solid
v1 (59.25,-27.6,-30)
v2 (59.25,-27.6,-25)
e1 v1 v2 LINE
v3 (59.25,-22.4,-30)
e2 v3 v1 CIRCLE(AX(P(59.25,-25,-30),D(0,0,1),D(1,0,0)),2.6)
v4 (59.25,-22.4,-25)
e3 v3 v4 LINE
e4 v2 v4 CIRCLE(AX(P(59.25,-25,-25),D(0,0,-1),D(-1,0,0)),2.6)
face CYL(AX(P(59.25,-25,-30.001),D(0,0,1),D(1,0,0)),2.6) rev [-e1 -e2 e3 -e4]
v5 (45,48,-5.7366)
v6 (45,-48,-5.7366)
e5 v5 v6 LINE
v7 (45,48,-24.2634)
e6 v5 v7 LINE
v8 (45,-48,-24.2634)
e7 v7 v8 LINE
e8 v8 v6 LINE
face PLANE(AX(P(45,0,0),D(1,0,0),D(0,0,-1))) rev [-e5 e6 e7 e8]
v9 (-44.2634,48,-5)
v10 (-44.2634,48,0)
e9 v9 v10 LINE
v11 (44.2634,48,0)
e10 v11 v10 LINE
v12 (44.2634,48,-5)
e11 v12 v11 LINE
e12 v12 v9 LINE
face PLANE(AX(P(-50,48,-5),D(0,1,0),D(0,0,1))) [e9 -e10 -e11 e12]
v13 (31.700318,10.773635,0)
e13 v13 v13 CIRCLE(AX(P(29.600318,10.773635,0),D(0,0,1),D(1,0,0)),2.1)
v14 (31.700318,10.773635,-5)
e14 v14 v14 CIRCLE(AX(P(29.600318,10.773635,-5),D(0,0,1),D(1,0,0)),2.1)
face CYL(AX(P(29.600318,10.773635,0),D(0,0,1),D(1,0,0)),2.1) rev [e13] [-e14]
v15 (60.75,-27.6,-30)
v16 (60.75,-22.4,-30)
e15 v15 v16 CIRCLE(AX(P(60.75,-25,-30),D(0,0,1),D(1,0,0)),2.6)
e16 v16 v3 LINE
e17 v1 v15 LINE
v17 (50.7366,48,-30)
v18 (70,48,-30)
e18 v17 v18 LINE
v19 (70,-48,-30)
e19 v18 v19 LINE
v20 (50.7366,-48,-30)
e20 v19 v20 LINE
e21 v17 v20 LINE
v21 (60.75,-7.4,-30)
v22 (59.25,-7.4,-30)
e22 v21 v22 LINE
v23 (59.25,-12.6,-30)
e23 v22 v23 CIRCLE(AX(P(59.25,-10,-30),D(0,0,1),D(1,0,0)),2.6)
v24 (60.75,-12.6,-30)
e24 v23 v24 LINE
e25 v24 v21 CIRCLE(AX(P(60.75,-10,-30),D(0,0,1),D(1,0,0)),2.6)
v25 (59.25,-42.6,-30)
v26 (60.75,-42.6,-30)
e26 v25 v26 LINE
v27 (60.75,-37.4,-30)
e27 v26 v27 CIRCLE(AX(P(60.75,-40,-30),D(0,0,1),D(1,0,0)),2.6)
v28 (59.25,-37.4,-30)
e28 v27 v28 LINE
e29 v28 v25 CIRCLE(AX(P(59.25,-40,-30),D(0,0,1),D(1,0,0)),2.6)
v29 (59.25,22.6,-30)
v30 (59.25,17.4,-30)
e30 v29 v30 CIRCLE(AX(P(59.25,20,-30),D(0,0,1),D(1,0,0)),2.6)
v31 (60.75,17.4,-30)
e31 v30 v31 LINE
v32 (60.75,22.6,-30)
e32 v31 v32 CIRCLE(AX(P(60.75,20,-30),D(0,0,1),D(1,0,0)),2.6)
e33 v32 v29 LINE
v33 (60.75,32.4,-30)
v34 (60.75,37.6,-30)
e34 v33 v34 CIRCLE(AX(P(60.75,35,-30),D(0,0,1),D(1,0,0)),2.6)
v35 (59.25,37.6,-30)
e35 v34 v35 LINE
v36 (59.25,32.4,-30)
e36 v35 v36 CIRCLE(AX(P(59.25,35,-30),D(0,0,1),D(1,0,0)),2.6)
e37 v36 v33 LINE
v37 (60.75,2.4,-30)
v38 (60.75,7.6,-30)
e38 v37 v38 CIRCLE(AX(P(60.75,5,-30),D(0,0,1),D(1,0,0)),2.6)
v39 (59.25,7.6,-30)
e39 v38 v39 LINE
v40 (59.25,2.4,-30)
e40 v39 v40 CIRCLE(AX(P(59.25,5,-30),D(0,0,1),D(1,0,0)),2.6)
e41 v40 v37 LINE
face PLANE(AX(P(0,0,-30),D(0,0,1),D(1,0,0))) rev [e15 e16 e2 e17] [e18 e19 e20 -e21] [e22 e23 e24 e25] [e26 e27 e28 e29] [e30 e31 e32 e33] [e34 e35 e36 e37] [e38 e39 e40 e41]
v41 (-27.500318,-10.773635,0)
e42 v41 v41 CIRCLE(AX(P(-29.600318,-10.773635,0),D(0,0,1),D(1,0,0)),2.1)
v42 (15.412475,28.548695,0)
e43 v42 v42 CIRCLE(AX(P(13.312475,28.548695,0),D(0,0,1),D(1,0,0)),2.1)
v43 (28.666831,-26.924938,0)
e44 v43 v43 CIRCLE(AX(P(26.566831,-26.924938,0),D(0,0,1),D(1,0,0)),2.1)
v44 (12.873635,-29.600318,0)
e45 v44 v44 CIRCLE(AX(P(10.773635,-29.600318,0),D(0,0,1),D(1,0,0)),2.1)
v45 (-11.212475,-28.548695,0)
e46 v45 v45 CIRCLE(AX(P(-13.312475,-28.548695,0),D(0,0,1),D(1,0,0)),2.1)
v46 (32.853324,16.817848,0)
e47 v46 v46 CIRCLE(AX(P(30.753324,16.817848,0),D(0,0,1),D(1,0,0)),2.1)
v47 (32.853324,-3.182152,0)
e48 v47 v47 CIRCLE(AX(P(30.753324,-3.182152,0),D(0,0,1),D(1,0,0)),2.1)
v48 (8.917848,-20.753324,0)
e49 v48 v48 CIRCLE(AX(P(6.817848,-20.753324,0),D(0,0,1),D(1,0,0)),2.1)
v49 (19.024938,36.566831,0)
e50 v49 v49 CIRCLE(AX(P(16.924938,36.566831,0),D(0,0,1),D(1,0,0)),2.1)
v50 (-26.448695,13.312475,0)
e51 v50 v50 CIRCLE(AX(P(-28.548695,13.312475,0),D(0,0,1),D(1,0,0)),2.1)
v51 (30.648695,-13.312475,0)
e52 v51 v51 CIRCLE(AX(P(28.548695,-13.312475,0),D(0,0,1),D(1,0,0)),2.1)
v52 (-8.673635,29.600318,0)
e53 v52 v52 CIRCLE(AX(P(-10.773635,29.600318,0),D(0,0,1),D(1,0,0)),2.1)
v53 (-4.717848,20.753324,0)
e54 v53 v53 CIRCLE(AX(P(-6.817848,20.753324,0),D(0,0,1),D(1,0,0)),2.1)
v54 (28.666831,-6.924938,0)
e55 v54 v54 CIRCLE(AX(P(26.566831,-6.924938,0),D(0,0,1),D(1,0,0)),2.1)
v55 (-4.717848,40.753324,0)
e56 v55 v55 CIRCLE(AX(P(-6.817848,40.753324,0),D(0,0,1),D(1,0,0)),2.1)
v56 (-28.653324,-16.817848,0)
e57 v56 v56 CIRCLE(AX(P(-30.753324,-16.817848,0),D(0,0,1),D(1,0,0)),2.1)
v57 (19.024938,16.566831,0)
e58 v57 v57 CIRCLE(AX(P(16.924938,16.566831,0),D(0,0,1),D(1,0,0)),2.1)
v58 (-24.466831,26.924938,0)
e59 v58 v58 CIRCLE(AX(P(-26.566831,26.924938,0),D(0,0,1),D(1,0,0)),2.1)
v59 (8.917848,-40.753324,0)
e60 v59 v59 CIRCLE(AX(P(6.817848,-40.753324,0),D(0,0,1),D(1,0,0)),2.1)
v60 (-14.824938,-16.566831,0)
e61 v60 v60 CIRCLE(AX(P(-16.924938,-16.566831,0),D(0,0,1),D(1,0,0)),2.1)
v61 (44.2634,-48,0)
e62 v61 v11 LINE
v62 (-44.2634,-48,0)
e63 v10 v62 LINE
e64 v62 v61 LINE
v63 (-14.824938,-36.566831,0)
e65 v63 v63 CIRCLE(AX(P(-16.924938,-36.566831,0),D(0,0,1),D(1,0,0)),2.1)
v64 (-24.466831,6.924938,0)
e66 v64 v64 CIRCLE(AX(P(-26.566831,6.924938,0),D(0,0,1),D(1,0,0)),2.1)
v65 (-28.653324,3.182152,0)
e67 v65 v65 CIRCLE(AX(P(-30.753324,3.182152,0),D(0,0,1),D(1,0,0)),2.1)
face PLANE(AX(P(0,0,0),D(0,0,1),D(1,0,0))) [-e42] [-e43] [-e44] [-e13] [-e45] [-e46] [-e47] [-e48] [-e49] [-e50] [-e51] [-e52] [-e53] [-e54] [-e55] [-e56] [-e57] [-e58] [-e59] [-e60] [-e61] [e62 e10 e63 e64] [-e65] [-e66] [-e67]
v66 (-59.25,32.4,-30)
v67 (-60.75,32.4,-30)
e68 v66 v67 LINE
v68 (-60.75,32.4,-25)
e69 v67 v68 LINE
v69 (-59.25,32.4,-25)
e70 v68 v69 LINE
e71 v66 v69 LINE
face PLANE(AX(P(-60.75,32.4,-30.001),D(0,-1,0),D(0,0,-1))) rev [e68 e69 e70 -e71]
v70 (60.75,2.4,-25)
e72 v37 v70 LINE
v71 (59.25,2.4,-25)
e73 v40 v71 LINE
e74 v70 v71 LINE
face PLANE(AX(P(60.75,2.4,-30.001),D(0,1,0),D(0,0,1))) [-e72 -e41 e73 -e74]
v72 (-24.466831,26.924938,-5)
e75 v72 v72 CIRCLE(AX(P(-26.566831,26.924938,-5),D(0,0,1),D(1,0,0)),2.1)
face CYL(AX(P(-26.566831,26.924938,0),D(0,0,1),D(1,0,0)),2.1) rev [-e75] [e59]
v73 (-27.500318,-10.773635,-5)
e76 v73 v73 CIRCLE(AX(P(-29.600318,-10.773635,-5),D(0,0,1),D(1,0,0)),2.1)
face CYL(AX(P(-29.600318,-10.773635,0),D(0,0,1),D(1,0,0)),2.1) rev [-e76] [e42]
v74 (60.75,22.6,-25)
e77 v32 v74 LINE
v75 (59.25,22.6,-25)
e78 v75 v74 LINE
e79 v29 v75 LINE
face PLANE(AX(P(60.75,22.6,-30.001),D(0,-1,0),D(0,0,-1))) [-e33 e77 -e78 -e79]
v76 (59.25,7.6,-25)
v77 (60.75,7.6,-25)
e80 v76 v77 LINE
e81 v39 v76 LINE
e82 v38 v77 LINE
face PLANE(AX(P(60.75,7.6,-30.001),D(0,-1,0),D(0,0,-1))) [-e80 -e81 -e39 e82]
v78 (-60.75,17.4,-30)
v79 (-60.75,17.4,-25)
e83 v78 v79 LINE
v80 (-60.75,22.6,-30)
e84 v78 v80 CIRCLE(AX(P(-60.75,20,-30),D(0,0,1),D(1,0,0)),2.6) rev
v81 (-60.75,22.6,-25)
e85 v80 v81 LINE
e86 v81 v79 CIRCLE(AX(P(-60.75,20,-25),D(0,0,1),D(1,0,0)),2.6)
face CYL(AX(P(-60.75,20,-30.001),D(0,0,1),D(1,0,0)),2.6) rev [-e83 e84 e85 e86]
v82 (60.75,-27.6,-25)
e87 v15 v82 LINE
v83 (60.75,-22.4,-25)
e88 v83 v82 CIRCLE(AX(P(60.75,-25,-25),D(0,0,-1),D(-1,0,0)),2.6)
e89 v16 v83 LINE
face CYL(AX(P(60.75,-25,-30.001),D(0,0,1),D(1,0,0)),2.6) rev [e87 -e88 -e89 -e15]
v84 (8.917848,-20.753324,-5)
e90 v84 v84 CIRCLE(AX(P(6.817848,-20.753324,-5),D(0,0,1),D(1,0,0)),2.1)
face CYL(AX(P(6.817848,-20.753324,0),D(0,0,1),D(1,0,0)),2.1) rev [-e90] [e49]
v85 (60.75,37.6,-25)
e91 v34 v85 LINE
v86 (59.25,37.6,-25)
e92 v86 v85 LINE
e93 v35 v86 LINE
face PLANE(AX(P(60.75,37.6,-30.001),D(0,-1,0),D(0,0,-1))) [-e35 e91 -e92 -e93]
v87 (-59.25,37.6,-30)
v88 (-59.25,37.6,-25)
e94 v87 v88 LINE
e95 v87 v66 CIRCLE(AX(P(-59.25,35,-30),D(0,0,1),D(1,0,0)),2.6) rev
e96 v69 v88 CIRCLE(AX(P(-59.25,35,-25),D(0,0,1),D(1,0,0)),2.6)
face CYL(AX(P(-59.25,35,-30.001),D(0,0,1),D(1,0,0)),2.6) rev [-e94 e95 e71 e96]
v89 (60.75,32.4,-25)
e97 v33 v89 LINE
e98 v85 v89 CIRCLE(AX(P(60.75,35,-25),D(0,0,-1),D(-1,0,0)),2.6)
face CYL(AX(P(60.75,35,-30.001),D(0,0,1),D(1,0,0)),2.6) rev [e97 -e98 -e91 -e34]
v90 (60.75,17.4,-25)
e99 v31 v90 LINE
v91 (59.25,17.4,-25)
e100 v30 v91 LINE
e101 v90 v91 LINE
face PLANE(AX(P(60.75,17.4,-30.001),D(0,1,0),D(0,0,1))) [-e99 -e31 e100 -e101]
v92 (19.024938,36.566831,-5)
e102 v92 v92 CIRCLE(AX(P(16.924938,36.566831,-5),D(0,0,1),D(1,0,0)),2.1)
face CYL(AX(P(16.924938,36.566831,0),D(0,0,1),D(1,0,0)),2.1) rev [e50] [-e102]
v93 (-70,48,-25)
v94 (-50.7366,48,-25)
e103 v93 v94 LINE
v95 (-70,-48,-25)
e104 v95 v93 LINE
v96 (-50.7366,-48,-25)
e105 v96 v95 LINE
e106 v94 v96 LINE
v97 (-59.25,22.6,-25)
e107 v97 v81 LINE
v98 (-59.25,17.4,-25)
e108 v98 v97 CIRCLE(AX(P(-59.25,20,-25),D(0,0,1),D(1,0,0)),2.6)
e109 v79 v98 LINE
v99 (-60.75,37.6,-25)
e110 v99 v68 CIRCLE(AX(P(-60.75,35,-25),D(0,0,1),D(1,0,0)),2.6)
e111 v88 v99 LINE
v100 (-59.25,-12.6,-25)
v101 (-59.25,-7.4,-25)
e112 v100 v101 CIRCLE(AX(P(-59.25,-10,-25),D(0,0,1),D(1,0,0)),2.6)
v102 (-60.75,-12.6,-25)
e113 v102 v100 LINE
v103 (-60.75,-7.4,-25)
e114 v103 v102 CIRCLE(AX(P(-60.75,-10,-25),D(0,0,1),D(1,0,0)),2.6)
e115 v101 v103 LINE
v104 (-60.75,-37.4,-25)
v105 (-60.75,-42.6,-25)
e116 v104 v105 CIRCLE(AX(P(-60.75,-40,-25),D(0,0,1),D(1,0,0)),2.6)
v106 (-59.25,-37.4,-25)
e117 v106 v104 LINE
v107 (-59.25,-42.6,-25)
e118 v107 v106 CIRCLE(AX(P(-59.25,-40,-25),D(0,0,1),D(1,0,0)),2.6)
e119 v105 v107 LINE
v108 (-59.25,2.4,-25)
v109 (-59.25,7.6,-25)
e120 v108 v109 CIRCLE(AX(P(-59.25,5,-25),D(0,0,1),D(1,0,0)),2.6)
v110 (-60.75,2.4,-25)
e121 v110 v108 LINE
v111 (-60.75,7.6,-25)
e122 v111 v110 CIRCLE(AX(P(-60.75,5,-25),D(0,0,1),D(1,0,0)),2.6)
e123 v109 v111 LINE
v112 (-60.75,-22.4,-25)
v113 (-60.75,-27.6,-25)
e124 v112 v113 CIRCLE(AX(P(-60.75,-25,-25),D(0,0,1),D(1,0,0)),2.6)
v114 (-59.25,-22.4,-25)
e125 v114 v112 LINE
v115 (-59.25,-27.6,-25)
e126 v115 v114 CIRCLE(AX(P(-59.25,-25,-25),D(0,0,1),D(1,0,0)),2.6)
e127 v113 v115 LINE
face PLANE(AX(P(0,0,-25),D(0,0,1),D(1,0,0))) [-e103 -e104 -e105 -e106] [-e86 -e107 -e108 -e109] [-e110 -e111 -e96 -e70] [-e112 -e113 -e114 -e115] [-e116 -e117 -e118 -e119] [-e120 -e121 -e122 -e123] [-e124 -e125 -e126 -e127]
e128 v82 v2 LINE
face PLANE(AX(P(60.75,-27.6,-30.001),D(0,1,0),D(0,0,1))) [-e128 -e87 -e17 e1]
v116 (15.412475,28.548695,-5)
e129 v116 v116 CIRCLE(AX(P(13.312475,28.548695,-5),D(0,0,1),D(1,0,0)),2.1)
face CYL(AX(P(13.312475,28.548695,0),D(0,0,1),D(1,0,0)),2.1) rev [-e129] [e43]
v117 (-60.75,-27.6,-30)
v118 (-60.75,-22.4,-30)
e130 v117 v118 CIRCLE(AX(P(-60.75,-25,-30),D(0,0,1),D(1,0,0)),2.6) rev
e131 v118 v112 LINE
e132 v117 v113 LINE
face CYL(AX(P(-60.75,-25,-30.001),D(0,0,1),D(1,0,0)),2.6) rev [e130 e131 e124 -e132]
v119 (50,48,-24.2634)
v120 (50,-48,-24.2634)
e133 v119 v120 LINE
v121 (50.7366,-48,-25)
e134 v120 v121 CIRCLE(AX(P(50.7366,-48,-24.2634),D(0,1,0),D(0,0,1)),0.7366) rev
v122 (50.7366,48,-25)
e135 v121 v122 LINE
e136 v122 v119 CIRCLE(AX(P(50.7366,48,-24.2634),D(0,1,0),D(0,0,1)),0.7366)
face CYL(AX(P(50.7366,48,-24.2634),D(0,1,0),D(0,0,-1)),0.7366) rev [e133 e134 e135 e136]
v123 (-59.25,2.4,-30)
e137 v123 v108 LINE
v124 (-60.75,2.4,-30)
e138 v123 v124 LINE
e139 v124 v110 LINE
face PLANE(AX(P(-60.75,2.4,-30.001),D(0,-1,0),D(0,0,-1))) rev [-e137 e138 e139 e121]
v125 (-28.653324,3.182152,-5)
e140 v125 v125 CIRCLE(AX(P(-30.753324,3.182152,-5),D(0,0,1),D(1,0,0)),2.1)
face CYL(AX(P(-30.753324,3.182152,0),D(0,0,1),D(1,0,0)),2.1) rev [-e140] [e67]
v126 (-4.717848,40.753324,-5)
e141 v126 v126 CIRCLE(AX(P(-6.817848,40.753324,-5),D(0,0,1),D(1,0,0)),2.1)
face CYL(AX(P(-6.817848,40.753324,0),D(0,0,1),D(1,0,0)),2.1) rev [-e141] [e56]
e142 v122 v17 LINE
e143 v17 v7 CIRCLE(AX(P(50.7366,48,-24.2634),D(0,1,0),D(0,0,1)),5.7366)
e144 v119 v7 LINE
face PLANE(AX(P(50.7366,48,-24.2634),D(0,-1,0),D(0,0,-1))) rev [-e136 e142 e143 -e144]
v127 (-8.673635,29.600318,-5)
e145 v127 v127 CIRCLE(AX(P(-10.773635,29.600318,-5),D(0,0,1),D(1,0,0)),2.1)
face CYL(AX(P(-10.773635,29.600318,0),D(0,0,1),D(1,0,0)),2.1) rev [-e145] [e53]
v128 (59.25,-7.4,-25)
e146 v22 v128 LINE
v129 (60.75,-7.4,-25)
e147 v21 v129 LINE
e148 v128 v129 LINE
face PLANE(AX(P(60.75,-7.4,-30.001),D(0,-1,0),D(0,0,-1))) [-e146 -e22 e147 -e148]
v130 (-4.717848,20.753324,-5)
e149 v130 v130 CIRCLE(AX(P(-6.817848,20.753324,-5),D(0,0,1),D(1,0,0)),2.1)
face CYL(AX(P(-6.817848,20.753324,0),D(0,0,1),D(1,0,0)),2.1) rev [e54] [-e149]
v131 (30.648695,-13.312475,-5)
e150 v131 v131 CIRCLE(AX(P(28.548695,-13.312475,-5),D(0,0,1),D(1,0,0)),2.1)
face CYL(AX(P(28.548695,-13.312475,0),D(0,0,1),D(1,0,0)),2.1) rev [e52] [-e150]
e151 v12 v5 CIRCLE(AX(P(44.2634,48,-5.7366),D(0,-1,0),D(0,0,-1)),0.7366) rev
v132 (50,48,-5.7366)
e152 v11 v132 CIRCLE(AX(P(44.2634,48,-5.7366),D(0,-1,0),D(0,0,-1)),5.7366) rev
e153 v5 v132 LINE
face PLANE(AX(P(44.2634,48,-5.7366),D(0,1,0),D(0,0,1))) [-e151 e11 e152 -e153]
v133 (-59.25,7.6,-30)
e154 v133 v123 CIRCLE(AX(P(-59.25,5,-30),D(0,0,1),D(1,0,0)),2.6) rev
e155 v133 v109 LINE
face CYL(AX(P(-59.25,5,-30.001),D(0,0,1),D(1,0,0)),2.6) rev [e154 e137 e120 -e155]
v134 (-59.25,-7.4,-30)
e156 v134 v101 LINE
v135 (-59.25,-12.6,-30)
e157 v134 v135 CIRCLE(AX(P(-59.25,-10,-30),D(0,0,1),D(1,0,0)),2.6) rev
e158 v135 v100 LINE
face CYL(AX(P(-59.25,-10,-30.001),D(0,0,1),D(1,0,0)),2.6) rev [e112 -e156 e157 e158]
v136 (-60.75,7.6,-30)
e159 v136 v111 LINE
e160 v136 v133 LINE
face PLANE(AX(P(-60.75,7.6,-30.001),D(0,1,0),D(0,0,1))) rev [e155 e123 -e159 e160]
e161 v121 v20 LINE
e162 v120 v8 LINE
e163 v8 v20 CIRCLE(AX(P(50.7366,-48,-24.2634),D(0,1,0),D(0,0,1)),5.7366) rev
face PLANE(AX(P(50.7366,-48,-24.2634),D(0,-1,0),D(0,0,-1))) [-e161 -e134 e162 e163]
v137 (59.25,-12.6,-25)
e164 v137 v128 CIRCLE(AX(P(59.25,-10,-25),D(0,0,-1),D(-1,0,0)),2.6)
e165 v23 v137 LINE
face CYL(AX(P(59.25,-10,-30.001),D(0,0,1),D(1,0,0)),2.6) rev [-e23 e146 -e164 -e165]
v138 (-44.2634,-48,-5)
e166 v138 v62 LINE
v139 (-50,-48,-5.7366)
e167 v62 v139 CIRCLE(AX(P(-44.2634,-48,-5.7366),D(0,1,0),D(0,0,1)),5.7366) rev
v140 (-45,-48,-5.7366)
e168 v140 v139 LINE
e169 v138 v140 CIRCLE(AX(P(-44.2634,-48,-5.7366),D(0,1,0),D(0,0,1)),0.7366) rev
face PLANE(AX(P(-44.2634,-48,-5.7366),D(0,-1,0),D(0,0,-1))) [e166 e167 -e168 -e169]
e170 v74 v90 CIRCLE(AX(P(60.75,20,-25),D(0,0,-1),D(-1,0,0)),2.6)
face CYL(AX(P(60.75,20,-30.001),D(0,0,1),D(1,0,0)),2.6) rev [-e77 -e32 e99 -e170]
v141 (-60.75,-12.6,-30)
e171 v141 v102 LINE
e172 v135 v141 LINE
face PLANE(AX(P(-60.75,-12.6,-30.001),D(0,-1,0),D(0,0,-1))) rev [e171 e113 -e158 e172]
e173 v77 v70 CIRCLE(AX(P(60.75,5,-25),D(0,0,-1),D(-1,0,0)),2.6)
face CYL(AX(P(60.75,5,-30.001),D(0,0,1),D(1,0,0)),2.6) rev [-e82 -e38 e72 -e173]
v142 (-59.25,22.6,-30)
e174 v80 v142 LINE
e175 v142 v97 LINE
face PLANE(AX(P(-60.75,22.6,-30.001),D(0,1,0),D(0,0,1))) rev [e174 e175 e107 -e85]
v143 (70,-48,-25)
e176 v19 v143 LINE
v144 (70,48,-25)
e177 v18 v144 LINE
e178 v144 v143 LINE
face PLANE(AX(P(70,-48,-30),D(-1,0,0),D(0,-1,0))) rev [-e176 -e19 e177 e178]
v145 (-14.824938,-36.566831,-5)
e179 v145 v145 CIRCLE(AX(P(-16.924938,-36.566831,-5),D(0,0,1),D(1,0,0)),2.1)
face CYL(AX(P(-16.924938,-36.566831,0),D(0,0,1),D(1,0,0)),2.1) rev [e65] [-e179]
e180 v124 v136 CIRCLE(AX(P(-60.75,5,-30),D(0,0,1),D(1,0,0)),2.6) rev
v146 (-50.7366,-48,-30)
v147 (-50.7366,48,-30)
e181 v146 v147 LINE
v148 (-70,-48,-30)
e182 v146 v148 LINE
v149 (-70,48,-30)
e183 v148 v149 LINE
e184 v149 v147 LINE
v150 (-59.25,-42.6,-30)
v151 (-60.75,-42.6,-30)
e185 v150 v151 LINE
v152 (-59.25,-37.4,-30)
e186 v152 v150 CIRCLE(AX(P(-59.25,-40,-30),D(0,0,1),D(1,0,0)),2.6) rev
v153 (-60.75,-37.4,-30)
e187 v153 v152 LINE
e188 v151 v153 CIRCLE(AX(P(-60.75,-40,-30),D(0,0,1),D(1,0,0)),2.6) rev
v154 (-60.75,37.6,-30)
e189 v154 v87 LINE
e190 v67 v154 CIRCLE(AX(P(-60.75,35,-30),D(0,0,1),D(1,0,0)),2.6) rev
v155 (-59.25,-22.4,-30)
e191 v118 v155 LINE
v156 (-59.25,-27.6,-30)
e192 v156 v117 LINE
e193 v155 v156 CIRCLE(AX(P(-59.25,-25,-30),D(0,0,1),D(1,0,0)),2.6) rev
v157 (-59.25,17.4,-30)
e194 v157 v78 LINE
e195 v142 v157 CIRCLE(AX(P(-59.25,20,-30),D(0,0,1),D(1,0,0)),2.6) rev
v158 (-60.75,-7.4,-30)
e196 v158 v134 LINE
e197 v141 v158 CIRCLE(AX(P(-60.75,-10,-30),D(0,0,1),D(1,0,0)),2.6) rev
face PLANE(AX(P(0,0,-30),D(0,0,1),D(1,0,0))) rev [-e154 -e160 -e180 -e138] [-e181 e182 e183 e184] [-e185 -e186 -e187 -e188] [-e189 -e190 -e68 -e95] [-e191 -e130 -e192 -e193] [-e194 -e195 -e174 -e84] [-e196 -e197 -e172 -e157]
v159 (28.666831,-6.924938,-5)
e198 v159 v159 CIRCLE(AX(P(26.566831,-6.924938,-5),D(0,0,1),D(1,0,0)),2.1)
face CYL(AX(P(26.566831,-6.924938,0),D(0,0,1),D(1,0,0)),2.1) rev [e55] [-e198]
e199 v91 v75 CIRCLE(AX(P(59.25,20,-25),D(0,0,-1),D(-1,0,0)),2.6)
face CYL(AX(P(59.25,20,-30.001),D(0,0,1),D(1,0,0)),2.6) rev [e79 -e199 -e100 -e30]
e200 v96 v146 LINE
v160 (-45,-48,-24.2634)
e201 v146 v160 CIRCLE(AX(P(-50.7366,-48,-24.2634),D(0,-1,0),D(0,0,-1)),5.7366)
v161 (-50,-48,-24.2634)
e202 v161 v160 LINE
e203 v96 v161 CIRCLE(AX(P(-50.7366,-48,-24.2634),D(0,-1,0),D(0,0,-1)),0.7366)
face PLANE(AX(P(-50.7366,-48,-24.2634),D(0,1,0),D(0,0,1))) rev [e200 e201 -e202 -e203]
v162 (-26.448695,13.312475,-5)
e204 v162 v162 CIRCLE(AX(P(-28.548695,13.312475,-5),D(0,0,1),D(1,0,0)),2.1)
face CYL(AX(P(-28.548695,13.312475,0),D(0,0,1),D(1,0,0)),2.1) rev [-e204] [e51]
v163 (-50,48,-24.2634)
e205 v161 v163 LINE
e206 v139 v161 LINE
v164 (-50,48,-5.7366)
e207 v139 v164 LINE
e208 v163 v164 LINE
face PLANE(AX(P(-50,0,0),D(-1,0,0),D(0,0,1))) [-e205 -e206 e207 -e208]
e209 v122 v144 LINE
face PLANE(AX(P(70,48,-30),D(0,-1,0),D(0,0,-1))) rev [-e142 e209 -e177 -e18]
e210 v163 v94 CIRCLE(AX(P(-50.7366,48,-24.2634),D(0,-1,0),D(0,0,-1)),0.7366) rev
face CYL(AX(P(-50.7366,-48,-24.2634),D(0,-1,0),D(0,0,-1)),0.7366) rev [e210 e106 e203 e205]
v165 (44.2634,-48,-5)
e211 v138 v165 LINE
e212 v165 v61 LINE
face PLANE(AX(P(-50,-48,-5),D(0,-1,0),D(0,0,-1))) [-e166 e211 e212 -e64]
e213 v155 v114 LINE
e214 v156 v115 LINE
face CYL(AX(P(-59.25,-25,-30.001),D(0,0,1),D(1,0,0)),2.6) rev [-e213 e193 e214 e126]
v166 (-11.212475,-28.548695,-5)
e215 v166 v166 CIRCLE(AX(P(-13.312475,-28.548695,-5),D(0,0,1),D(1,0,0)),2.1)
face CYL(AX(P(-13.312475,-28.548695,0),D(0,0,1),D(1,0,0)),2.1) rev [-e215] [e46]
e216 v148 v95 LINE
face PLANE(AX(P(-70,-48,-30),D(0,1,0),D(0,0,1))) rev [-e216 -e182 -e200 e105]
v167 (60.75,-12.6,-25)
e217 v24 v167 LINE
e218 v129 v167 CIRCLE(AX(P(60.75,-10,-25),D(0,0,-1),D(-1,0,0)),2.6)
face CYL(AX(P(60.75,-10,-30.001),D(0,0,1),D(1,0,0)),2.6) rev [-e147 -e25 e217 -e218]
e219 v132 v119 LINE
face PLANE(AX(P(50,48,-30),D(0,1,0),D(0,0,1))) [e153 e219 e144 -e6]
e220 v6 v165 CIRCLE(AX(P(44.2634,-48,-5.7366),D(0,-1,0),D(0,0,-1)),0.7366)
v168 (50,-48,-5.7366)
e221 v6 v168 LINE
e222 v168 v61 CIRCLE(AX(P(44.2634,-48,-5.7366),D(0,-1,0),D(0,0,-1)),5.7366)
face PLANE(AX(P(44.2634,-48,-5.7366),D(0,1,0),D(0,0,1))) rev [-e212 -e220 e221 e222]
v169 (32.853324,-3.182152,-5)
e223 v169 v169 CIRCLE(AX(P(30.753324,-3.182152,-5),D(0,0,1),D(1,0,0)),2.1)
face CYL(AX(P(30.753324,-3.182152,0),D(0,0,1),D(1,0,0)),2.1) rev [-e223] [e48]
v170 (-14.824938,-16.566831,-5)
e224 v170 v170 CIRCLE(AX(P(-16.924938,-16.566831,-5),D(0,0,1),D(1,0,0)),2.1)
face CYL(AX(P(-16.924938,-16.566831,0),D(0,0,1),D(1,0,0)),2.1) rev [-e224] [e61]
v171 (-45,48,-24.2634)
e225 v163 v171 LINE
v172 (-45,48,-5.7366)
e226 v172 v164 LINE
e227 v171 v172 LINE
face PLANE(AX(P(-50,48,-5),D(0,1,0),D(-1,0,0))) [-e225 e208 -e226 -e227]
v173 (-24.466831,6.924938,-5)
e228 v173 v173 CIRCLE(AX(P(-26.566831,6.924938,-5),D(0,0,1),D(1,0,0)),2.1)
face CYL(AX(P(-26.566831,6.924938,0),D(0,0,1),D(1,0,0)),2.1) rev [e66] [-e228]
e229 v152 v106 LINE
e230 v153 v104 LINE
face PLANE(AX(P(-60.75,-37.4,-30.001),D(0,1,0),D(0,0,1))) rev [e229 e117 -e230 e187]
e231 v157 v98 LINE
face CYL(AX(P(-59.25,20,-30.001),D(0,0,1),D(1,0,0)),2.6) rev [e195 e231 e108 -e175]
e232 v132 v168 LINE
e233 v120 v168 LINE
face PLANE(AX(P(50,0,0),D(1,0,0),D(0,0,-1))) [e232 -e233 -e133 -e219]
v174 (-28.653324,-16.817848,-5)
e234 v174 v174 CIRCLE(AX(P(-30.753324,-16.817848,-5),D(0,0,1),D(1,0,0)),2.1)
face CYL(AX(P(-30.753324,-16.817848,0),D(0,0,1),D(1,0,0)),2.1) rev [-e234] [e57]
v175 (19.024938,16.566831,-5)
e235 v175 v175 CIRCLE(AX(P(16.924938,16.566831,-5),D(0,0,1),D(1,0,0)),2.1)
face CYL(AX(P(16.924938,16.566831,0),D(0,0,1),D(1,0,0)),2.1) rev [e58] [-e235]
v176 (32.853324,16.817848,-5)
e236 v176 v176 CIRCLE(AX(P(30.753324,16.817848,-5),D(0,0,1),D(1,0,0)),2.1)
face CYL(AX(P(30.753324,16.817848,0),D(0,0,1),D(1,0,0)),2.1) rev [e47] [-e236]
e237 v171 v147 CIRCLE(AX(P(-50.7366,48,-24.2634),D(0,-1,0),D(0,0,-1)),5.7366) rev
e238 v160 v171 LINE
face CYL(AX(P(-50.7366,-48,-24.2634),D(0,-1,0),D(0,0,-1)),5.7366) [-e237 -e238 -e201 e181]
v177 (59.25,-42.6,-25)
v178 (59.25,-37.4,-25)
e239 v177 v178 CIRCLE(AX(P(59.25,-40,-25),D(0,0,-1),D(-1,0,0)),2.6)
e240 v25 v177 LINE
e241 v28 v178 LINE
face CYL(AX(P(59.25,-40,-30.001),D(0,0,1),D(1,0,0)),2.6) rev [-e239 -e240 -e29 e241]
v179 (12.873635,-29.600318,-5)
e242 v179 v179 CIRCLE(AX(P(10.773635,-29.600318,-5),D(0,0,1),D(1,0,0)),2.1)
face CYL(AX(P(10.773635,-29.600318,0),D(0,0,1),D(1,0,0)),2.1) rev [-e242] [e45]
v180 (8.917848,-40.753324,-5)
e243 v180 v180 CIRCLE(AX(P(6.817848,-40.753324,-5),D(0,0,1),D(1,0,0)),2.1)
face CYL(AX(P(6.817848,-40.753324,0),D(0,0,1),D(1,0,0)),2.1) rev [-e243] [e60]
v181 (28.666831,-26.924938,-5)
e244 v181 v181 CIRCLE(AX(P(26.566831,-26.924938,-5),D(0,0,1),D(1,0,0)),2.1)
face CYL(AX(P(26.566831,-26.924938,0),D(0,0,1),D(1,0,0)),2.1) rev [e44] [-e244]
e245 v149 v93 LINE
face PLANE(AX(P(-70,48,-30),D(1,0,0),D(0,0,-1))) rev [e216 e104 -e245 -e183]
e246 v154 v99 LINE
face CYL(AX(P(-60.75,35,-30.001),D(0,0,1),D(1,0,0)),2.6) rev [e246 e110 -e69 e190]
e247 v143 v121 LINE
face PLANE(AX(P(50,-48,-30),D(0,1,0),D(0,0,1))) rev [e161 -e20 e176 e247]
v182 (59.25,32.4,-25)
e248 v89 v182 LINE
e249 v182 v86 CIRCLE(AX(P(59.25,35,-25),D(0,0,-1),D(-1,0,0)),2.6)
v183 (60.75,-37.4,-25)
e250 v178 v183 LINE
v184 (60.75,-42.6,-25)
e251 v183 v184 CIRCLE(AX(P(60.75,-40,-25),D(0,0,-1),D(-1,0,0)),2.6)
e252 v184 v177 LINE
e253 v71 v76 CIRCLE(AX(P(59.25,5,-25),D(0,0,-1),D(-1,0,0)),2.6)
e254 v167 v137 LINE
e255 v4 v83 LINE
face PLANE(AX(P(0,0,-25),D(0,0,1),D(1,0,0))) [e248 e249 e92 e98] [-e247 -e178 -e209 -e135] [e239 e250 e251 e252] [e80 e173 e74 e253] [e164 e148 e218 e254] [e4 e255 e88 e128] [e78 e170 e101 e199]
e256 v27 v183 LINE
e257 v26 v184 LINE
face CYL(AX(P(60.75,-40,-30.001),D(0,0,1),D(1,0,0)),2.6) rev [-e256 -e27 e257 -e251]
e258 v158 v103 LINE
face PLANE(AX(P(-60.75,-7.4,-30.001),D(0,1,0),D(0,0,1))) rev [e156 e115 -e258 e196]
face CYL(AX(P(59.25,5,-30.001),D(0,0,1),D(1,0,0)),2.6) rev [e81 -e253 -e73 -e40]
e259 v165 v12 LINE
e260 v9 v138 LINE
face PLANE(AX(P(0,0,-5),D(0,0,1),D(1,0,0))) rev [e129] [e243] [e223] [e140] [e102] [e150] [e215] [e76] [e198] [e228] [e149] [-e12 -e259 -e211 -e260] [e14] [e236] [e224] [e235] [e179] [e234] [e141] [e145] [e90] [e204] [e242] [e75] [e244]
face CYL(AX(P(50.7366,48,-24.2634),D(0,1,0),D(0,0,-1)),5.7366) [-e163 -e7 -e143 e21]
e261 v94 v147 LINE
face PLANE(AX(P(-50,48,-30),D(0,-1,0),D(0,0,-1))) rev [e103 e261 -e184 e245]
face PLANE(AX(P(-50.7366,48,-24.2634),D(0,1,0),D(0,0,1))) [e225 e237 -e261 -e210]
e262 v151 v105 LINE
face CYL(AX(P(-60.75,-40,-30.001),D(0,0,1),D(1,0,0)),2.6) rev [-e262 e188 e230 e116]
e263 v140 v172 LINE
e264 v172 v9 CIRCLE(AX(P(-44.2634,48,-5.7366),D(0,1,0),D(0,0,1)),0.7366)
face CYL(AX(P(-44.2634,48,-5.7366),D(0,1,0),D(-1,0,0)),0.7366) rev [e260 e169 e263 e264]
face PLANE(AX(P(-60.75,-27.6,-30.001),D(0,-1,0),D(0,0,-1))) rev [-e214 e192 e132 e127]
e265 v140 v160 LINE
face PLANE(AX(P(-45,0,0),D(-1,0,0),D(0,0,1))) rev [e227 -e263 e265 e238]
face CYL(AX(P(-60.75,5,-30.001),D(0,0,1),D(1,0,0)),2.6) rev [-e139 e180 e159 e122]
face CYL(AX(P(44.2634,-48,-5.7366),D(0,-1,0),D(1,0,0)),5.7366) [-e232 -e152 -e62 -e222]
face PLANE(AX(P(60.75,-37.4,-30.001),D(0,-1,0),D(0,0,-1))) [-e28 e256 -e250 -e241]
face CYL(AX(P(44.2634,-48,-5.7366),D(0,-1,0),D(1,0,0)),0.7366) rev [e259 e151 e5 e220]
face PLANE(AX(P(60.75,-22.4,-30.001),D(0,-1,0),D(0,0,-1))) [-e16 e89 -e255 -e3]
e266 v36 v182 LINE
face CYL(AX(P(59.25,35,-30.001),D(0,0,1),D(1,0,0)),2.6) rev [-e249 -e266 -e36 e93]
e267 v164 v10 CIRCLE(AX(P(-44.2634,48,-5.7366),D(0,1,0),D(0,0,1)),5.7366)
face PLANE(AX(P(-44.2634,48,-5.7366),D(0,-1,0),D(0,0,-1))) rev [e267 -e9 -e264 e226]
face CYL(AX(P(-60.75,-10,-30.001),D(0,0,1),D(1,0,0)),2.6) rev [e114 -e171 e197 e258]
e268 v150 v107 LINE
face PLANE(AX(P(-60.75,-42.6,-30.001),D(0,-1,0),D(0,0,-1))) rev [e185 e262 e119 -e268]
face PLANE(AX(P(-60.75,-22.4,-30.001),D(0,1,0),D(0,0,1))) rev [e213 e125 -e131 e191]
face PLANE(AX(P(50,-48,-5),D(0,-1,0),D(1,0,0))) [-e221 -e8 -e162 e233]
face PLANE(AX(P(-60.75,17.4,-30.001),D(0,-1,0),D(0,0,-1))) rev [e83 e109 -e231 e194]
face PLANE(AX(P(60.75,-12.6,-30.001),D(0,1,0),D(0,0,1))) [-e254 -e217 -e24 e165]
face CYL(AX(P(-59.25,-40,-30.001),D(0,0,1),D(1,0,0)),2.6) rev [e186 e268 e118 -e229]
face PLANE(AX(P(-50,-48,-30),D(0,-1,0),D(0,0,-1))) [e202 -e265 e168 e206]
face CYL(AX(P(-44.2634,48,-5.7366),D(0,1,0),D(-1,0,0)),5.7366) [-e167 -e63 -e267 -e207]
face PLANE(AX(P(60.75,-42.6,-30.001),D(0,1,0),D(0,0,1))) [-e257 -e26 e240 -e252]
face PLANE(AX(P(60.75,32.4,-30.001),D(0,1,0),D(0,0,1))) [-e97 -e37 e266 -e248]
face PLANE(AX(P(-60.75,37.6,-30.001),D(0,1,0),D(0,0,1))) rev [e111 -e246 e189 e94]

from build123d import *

# Parameters (mm, degrees)
ESBO_O1_W                      = 100
ESBO_O1_H                      = 96
FLANGE_BASE1_DEPTH             = 5
ARESTA_FLANGE1_STRIP_W         = 21.4732
ARESTA_FLANGE1_STRIP_H         = 5
ARESTA_FLANGE1_STRIP_CUT_DEPTH = 96
ARESTA_FLANGE1_DEPTH           = 96
ARESTA_FLANGE2_STRIP_W         = 21.4732
ARESTA_FLANGE2_STRIP_H         = 5
ARESTA_FLANGE2_STRIP_CUT_DEPTH = 96
ARESTA_FLANGE2_DEPTH           = 96
ARESTA_FLANGE3_STRIP_W         = 21.4732
ARESTA_FLANGE3_STRIP_H         = 5
ARESTA_FLANGE3_STRIP_CUT_DEPTH = 96
ARESTA_FLANGE3_DEPTH           = 96
ARESTA_FLANGE4_STRIP_W         = 21.4732
ARESTA_FLANGE4_STRIP_H         = 5
ARESTA_FLANGE4_STRIP_CUT_DEPTH = 96
ARESTA_FLANGE4_DEPTH           = 96
FURO_DE_DI_METRO_4_2_4_2_1_D   = 4.2
PADR_OCIRCULAR1_COUNT          = 8
FURO_DE_DI_METRO_4_2_4_2_2_D   = 4.2
PADR_OCIRCULAR2_COUNT          = 8
FURO_DE_DI_METRO_4_2_4_2_3_D   = 4.2
PADR_OCIRCULAR3_COUNT          = 8
CORTE_EXTRUS_O1_REACH          = 90.482
PADR_O_LINEAR2_COUNT           = 6
PADR_O_LINEAR2_PITCH           = 15
ESPELHAR2_COPY_1_REACH         = 90.482
ESPELHAR2_COPY_2_REACH         = 90.482
ESPELHAR2_COPY_3_REACH         = 90.482
ESPELHAR2_COPY_4_REACH         = 90.482
ESPELHAR2_COPY_5_REACH         = 90.482


# Sheet-metal steps are written as plain solids
with BuildPart() as part:
    # Esboço1 → Flange-base1 (new body)
    with BuildSketch(Plane.XY):
        Rectangle(ESBO_O1_W, ESBO_O1_H)
    extrude(amount=-FLANGE_BASE1_DEPTH)

    # Aresta-Flange1 strip (across the edge) → Aresta-Flange1 strip cut (cut)
    with BuildSketch(Plane(origin=(50, 48, -5), x_dir=(-1, 0, 0), z_dir=(0, -1, 0))):
        with Locations((-5, -2.5)):
            Rectangle(ARESTA_FLANGE1_STRIP_W, ARESTA_FLANGE1_STRIP_H)
    extrude(amount=ARESTA_FLANGE1_STRIP_CUT_DEPTH, mode=Mode.SUBTRACT)

    # Aresta-Flange1 section (across the edge) → Aresta-Flange1 (add)
    with BuildSketch(Plane(origin=(50, 48, -5), x_dir=(-1, 0, 0), z_dir=(0, -1, 0))):
        with BuildLine():
            Line((0, 0.7366), (0, 25))
            Line((0, 25), (5, 25))
            Line((5, 25), (5, 0.7366))
            ThreePointArc((5, 0.7366), (5.215745145, 0.215745145), (5.7366, 0))
            Line((5.7366, 0), (5.7366, -5))
            ThreePointArc((5.7366, -5), (1.680211239, -3.319788761), (0, 0.7366))
        make_face()
    extrude(amount=ARESTA_FLANGE1_DEPTH)

    # Aresta-Flange2 strip (across the edge) → Aresta-Flange2 strip cut (cut)
    with BuildSketch(Plane(origin=(50, -48, -30), x_dir=(0, 0, 1), z_dir=(0, 1, 0))):
        with Locations((-5, -2.5)):
            Rectangle(ARESTA_FLANGE2_STRIP_W, ARESTA_FLANGE2_STRIP_H)
    extrude(amount=ARESTA_FLANGE2_STRIP_CUT_DEPTH, mode=Mode.SUBTRACT)

    # Aresta-Flange2 section (across the edge) → Aresta-Flange2 (add)
    with BuildSketch(Plane(origin=(50, -48, -30), x_dir=(0, 0, 1), z_dir=(0, 1, 0))):
        with BuildLine():
            Line((0, 0.7366), (0, 20))
            Line((0, 20), (5, 20))
            Line((5, 20), (5, 0.7366))
            ThreePointArc((5, 0.7366), (5.215745145, 0.215745145), (5.7366, 0))
            Line((5.7366, 0), (5.7366, -5))
            ThreePointArc((5.7366, -5), (1.680211239, -3.319788761), (0, 0.7366))
        make_face()
    extrude(amount=ARESTA_FLANGE2_DEPTH)

    # Aresta-Flange3 strip (across the edge) → Aresta-Flange3 strip cut (cut)
    with BuildSketch(Plane(origin=(-50, -48, -5), x_dir=(1, 0, 0), z_dir=(0, 1, 0))):
        with Locations((-5, -2.5)):
            Rectangle(ARESTA_FLANGE3_STRIP_W, ARESTA_FLANGE3_STRIP_H)
    extrude(amount=ARESTA_FLANGE3_STRIP_CUT_DEPTH, mode=Mode.SUBTRACT)

    # Aresta-Flange3 section (across the edge) → Aresta-Flange3 (add)
    with BuildSketch(Plane(origin=(-50, -48, -5), x_dir=(1, 0, 0), z_dir=(0, 1, 0))):
        with BuildLine():
            Line((0, 0.7366), (0, 25))
            Line((0, 25), (5, 25))
            Line((5, 25), (5, 0.7366))
            ThreePointArc((5, 0.7366), (5.215745145, 0.215745145), (5.7366, 0))
            Line((5.7366, 0), (5.7366, -5))
            ThreePointArc((5.7366, -5), (1.680211239, -3.319788761), (0, 0.7366))
        make_face()
    extrude(amount=ARESTA_FLANGE3_DEPTH)

    # Aresta-Flange4 strip (across the edge) → Aresta-Flange4 strip cut (cut)
    with BuildSketch(Plane(origin=(-50, 48, -30), x_dir=(0, 0, 1), z_dir=(0, -1, 0))):
        with Locations((-5, -2.5)):
            Rectangle(ARESTA_FLANGE4_STRIP_W, ARESTA_FLANGE4_STRIP_H)
    extrude(amount=ARESTA_FLANGE4_STRIP_CUT_DEPTH, mode=Mode.SUBTRACT)

    # Aresta-Flange4 section (across the edge) → Aresta-Flange4 (add)
    with BuildSketch(Plane(origin=(-50, 48, -30), x_dir=(0, 0, 1), z_dir=(0, -1, 0))):
        with BuildLine():
            Line((0, 0.7366), (0, 20))
            Line((0, 20), (5, 20))
            Line((5, 20), (5, 0.7366))
            ThreePointArc((5, 0.7366), (5.215745145, 0.215745145), (5.7366, 0))
            Line((5.7366, 0), (5.7366, -5))
            ThreePointArc((5.7366, -5), (1.680211239, -3.319788761), (0, 0.7366))
        make_face()
    extrude(amount=ARESTA_FLANGE4_DEPTH)

    # Furo de diâmetro Ø4.2 (4.2)1 (through all)
    with Locations(Plane(origin=(-10.773634515, 29.600317555, 0), x_dir=(1, 0, 0), z_dir=(0, 0, 1))):
        with Locations((0, 0)):
            furo_de_di_metro_4_2_4_2_1 = Hole(FURO_DE_DI_METRO_4_2_4_2_1_D / 2)

    # PadrãoCircular1: Furo de diâmetro Ø4.2 (4.2)1 ×8 about axis
    padr_ocircular1_axis = Axis((0, 0, 0), (0, 0, 1))
    for i in range(1, PADR_OCIRCULAR1_COUNT):
        add(furo_de_di_metro_4_2_4_2_1.rotate(padr_ocircular1_axis, i * 360 / PADR_OCIRCULAR1_COUNT), mode=Mode.SUBTRACT)

    # Furo de diâmetro Ø4.2 (4.2)2 (through all)
    with Locations(Plane(origin=(-6.817847839, 40.753324224, 0), x_dir=(1, 0, 0), z_dir=(0, 0, 1))):
        with Locations((0, 0)):
            furo_de_di_metro_4_2_4_2_2 = Hole(FURO_DE_DI_METRO_4_2_4_2_2_D / 2)

    # PadrãoCircular2: Furo de diâmetro Ø4.2 (4.2)2 ×8 about axis
    padr_ocircular2_axis = Axis((0, 10, 0), (0, 0, 1))
    for i in range(1, PADR_OCIRCULAR2_COUNT):
        add(furo_de_di_metro_4_2_4_2_2.rotate(padr_ocircular2_axis, i * 360 / PADR_OCIRCULAR2_COUNT), mode=Mode.SUBTRACT)

    # Furo de diâmetro Ø4.2 (4.2)3 (through all)
    with Locations(Plane(origin=(-6.817847839, 20.753324224, 0), x_dir=(1, 0, 0), z_dir=(0, 0, 1))):
        with Locations((0, 0)):
            furo_de_di_metro_4_2_4_2_3 = Hole(FURO_DE_DI_METRO_4_2_4_2_3_D / 2)

    # PadrãoCircular3: Furo de diâmetro Ø4.2 (4.2)3 ×8 about axis
    padr_ocircular3_axis = Axis((0, -10, 0), (0, 0, 1))
    for i in range(1, PADR_OCIRCULAR3_COUNT):
        add(furo_de_di_metro_4_2_4_2_3.rotate(padr_ocircular3_axis, i * 360 / PADR_OCIRCULAR3_COUNT), mode=Mode.SUBTRACT)

    # Esboço24 → Corte-extrusão1 (cut, up to next)
    with BuildSketch(Plane.XY.offset(-25), mode=Mode.PRIVATE) as corte_extrus_o1_sk1:
        with BuildLine():
            Line((-60.75, -37.4), (-59.25, -37.4))
            ThreePointArc((-59.25, -37.4), (-56.65, -40), (-59.25, -42.6))
            Line((-59.25, -42.6), (-60.75, -42.6))
            ThreePointArc((-60.75, -42.6), (-63.35, -40), (-60.75, -37.4))
        make_face()
    corte_extrus_o1_tool1 = extrude(corte_extrus_o1_sk1.sketch, amount=-CORTE_EXTRUS_O1_REACH, mode=Mode.PRIVATE) & part.part
    corte_extrus_o1 = corte_extrus_o1_tool1.solids().sort_by_distance((-60, -40, -25))[0]
    add(corte_extrus_o1, mode=Mode.SUBTRACT)

    # Padrão linear2: Corte-extrusão1 ×6
    with Locations(*[(0, i * PADR_O_LINEAR2_PITCH, 0) for i in range(1, PADR_O_LINEAR2_COUNT)]):
        add(corte_extrus_o1, mode=Mode.SUBTRACT)

    # Espelhar2: Corte-extrusão1 across plane
    add(corte_extrus_o1.mirror(Plane(origin=(0, 0, 0), x_dir=(0, 0, 1), z_dir=(1, 0, 0))), mode=Mode.SUBTRACT)

    # Espelhar2 copy 1 sketch → Espelhar2 copy 1 (cut, up to next)
    with BuildSketch(Plane(origin=(0, 15, -25), x_dir=(-1, 0, 0), z_dir=(0, 0, 1)), mode=Mode.PRIVATE) as espelhar2_copy_1_sk1:
        with BuildLine():
            Line((-60.75, 37.4), (-59.25, 37.4))
            ThreePointArc((-59.25, 37.4), (-56.65, 40), (-59.25, 42.6))
            Line((-59.25, 42.6), (-60.75, 42.6))
            ThreePointArc((-60.75, 42.6), (-63.35, 40), (-60.75, 37.4))
        make_face()
    espelhar2_copy_1_tool1 = extrude(espelhar2_copy_1_sk1.sketch, amount=-ESPELHAR2_COPY_1_REACH, mode=Mode.PRIVATE) & part.part
    add(espelhar2_copy_1_tool1.solids().sort_by_distance((60, -25, -25))[0], mode=Mode.SUBTRACT)

    # Espelhar2 copy 2 sketch → Espelhar2 copy 2 (cut, up to next)
    with BuildSketch(Plane(origin=(0, 30, -25), x_dir=(-1, 0, 0), z_dir=(0, 0, 1)), mode=Mode.PRIVATE) as espelhar2_copy_2_sk1:
        with BuildLine():
            Line((-60.75, 37.4), (-59.25, 37.4))
            ThreePointArc((-59.25, 37.4), (-56.65, 40), (-59.25, 42.6))
            Line((-59.25, 42.6), (-60.75, 42.6))
            ThreePointArc((-60.75, 42.6), (-63.35, 40), (-60.75, 37.4))
        make_face()
    espelhar2_copy_2_tool1 = extrude(espelhar2_copy_2_sk1.sketch, amount=-ESPELHAR2_COPY_2_REACH, mode=Mode.PRIVATE) & part.part
    add(espelhar2_copy_2_tool1.solids().sort_by_distance((60, -10, -25))[0], mode=Mode.SUBTRACT)

    # Espelhar2 copy 3 sketch → Espelhar2 copy 3 (cut, up to next)
    with BuildSketch(Plane(origin=(0, 45, -25), x_dir=(-1, 0, 0), z_dir=(0, 0, 1)), mode=Mode.PRIVATE) as espelhar2_copy_3_sk1:
        with BuildLine():
            Line((-60.75, 37.4), (-59.25, 37.4))
            ThreePointArc((-59.25, 37.4), (-56.65, 40), (-59.25, 42.6))
            Line((-59.25, 42.6), (-60.75, 42.6))
            ThreePointArc((-60.75, 42.6), (-63.35, 40), (-60.75, 37.4))
        make_face()
    espelhar2_copy_3_tool1 = extrude(espelhar2_copy_3_sk1.sketch, amount=-ESPELHAR2_COPY_3_REACH, mode=Mode.PRIVATE) & part.part
    add(espelhar2_copy_3_tool1.solids().sort_by_distance((60, 5, -25))[0], mode=Mode.SUBTRACT)

    # Espelhar2 copy 4 sketch → Espelhar2 copy 4 (cut, up to next)
    with BuildSketch(Plane(origin=(0, 60, -25), x_dir=(-1, 0, 0), z_dir=(0, 0, 1)), mode=Mode.PRIVATE) as espelhar2_copy_4_sk1:
        with BuildLine():
            Line((-60.75, 37.4), (-59.25, 37.4))
            ThreePointArc((-59.25, 37.4), (-56.65, 40), (-59.25, 42.6))
            Line((-59.25, 42.6), (-60.75, 42.6))
            ThreePointArc((-60.75, 42.6), (-63.35, 40), (-60.75, 37.4))
        make_face()
    espelhar2_copy_4_tool1 = extrude(espelhar2_copy_4_sk1.sketch, amount=-ESPELHAR2_COPY_4_REACH, mode=Mode.PRIVATE) & part.part
    add(espelhar2_copy_4_tool1.solids().sort_by_distance((60, 20, -25))[0], mode=Mode.SUBTRACT)

    # Espelhar2 copy 5 sketch → Espelhar2 copy 5 (cut, up to next)
    with BuildSketch(Plane(origin=(0, 75, -25), x_dir=(-1, 0, 0), z_dir=(0, 0, 1)), mode=Mode.PRIVATE) as espelhar2_copy_5_sk1:
        with BuildLine():
            Line((-60.75, 37.4), (-59.25, 37.4))
            ThreePointArc((-59.25, 37.4), (-56.65, 40), (-59.25, 42.6))
            Line((-59.25, 42.6), (-60.75, 42.6))
            ThreePointArc((-60.75, 42.6), (-63.35, 40), (-60.75, 37.4))
        make_face()
    espelhar2_copy_5_tool1 = extrude(espelhar2_copy_5_sk1.sketch, amount=-ESPELHAR2_COPY_5_REACH, mode=Mode.PRIVATE) & part.part
    add(espelhar2_copy_5_tool1.solids().sort_by_distance((60, 35, -25))[0], mode=Mode.SUBTRACT)


solid = part.part
